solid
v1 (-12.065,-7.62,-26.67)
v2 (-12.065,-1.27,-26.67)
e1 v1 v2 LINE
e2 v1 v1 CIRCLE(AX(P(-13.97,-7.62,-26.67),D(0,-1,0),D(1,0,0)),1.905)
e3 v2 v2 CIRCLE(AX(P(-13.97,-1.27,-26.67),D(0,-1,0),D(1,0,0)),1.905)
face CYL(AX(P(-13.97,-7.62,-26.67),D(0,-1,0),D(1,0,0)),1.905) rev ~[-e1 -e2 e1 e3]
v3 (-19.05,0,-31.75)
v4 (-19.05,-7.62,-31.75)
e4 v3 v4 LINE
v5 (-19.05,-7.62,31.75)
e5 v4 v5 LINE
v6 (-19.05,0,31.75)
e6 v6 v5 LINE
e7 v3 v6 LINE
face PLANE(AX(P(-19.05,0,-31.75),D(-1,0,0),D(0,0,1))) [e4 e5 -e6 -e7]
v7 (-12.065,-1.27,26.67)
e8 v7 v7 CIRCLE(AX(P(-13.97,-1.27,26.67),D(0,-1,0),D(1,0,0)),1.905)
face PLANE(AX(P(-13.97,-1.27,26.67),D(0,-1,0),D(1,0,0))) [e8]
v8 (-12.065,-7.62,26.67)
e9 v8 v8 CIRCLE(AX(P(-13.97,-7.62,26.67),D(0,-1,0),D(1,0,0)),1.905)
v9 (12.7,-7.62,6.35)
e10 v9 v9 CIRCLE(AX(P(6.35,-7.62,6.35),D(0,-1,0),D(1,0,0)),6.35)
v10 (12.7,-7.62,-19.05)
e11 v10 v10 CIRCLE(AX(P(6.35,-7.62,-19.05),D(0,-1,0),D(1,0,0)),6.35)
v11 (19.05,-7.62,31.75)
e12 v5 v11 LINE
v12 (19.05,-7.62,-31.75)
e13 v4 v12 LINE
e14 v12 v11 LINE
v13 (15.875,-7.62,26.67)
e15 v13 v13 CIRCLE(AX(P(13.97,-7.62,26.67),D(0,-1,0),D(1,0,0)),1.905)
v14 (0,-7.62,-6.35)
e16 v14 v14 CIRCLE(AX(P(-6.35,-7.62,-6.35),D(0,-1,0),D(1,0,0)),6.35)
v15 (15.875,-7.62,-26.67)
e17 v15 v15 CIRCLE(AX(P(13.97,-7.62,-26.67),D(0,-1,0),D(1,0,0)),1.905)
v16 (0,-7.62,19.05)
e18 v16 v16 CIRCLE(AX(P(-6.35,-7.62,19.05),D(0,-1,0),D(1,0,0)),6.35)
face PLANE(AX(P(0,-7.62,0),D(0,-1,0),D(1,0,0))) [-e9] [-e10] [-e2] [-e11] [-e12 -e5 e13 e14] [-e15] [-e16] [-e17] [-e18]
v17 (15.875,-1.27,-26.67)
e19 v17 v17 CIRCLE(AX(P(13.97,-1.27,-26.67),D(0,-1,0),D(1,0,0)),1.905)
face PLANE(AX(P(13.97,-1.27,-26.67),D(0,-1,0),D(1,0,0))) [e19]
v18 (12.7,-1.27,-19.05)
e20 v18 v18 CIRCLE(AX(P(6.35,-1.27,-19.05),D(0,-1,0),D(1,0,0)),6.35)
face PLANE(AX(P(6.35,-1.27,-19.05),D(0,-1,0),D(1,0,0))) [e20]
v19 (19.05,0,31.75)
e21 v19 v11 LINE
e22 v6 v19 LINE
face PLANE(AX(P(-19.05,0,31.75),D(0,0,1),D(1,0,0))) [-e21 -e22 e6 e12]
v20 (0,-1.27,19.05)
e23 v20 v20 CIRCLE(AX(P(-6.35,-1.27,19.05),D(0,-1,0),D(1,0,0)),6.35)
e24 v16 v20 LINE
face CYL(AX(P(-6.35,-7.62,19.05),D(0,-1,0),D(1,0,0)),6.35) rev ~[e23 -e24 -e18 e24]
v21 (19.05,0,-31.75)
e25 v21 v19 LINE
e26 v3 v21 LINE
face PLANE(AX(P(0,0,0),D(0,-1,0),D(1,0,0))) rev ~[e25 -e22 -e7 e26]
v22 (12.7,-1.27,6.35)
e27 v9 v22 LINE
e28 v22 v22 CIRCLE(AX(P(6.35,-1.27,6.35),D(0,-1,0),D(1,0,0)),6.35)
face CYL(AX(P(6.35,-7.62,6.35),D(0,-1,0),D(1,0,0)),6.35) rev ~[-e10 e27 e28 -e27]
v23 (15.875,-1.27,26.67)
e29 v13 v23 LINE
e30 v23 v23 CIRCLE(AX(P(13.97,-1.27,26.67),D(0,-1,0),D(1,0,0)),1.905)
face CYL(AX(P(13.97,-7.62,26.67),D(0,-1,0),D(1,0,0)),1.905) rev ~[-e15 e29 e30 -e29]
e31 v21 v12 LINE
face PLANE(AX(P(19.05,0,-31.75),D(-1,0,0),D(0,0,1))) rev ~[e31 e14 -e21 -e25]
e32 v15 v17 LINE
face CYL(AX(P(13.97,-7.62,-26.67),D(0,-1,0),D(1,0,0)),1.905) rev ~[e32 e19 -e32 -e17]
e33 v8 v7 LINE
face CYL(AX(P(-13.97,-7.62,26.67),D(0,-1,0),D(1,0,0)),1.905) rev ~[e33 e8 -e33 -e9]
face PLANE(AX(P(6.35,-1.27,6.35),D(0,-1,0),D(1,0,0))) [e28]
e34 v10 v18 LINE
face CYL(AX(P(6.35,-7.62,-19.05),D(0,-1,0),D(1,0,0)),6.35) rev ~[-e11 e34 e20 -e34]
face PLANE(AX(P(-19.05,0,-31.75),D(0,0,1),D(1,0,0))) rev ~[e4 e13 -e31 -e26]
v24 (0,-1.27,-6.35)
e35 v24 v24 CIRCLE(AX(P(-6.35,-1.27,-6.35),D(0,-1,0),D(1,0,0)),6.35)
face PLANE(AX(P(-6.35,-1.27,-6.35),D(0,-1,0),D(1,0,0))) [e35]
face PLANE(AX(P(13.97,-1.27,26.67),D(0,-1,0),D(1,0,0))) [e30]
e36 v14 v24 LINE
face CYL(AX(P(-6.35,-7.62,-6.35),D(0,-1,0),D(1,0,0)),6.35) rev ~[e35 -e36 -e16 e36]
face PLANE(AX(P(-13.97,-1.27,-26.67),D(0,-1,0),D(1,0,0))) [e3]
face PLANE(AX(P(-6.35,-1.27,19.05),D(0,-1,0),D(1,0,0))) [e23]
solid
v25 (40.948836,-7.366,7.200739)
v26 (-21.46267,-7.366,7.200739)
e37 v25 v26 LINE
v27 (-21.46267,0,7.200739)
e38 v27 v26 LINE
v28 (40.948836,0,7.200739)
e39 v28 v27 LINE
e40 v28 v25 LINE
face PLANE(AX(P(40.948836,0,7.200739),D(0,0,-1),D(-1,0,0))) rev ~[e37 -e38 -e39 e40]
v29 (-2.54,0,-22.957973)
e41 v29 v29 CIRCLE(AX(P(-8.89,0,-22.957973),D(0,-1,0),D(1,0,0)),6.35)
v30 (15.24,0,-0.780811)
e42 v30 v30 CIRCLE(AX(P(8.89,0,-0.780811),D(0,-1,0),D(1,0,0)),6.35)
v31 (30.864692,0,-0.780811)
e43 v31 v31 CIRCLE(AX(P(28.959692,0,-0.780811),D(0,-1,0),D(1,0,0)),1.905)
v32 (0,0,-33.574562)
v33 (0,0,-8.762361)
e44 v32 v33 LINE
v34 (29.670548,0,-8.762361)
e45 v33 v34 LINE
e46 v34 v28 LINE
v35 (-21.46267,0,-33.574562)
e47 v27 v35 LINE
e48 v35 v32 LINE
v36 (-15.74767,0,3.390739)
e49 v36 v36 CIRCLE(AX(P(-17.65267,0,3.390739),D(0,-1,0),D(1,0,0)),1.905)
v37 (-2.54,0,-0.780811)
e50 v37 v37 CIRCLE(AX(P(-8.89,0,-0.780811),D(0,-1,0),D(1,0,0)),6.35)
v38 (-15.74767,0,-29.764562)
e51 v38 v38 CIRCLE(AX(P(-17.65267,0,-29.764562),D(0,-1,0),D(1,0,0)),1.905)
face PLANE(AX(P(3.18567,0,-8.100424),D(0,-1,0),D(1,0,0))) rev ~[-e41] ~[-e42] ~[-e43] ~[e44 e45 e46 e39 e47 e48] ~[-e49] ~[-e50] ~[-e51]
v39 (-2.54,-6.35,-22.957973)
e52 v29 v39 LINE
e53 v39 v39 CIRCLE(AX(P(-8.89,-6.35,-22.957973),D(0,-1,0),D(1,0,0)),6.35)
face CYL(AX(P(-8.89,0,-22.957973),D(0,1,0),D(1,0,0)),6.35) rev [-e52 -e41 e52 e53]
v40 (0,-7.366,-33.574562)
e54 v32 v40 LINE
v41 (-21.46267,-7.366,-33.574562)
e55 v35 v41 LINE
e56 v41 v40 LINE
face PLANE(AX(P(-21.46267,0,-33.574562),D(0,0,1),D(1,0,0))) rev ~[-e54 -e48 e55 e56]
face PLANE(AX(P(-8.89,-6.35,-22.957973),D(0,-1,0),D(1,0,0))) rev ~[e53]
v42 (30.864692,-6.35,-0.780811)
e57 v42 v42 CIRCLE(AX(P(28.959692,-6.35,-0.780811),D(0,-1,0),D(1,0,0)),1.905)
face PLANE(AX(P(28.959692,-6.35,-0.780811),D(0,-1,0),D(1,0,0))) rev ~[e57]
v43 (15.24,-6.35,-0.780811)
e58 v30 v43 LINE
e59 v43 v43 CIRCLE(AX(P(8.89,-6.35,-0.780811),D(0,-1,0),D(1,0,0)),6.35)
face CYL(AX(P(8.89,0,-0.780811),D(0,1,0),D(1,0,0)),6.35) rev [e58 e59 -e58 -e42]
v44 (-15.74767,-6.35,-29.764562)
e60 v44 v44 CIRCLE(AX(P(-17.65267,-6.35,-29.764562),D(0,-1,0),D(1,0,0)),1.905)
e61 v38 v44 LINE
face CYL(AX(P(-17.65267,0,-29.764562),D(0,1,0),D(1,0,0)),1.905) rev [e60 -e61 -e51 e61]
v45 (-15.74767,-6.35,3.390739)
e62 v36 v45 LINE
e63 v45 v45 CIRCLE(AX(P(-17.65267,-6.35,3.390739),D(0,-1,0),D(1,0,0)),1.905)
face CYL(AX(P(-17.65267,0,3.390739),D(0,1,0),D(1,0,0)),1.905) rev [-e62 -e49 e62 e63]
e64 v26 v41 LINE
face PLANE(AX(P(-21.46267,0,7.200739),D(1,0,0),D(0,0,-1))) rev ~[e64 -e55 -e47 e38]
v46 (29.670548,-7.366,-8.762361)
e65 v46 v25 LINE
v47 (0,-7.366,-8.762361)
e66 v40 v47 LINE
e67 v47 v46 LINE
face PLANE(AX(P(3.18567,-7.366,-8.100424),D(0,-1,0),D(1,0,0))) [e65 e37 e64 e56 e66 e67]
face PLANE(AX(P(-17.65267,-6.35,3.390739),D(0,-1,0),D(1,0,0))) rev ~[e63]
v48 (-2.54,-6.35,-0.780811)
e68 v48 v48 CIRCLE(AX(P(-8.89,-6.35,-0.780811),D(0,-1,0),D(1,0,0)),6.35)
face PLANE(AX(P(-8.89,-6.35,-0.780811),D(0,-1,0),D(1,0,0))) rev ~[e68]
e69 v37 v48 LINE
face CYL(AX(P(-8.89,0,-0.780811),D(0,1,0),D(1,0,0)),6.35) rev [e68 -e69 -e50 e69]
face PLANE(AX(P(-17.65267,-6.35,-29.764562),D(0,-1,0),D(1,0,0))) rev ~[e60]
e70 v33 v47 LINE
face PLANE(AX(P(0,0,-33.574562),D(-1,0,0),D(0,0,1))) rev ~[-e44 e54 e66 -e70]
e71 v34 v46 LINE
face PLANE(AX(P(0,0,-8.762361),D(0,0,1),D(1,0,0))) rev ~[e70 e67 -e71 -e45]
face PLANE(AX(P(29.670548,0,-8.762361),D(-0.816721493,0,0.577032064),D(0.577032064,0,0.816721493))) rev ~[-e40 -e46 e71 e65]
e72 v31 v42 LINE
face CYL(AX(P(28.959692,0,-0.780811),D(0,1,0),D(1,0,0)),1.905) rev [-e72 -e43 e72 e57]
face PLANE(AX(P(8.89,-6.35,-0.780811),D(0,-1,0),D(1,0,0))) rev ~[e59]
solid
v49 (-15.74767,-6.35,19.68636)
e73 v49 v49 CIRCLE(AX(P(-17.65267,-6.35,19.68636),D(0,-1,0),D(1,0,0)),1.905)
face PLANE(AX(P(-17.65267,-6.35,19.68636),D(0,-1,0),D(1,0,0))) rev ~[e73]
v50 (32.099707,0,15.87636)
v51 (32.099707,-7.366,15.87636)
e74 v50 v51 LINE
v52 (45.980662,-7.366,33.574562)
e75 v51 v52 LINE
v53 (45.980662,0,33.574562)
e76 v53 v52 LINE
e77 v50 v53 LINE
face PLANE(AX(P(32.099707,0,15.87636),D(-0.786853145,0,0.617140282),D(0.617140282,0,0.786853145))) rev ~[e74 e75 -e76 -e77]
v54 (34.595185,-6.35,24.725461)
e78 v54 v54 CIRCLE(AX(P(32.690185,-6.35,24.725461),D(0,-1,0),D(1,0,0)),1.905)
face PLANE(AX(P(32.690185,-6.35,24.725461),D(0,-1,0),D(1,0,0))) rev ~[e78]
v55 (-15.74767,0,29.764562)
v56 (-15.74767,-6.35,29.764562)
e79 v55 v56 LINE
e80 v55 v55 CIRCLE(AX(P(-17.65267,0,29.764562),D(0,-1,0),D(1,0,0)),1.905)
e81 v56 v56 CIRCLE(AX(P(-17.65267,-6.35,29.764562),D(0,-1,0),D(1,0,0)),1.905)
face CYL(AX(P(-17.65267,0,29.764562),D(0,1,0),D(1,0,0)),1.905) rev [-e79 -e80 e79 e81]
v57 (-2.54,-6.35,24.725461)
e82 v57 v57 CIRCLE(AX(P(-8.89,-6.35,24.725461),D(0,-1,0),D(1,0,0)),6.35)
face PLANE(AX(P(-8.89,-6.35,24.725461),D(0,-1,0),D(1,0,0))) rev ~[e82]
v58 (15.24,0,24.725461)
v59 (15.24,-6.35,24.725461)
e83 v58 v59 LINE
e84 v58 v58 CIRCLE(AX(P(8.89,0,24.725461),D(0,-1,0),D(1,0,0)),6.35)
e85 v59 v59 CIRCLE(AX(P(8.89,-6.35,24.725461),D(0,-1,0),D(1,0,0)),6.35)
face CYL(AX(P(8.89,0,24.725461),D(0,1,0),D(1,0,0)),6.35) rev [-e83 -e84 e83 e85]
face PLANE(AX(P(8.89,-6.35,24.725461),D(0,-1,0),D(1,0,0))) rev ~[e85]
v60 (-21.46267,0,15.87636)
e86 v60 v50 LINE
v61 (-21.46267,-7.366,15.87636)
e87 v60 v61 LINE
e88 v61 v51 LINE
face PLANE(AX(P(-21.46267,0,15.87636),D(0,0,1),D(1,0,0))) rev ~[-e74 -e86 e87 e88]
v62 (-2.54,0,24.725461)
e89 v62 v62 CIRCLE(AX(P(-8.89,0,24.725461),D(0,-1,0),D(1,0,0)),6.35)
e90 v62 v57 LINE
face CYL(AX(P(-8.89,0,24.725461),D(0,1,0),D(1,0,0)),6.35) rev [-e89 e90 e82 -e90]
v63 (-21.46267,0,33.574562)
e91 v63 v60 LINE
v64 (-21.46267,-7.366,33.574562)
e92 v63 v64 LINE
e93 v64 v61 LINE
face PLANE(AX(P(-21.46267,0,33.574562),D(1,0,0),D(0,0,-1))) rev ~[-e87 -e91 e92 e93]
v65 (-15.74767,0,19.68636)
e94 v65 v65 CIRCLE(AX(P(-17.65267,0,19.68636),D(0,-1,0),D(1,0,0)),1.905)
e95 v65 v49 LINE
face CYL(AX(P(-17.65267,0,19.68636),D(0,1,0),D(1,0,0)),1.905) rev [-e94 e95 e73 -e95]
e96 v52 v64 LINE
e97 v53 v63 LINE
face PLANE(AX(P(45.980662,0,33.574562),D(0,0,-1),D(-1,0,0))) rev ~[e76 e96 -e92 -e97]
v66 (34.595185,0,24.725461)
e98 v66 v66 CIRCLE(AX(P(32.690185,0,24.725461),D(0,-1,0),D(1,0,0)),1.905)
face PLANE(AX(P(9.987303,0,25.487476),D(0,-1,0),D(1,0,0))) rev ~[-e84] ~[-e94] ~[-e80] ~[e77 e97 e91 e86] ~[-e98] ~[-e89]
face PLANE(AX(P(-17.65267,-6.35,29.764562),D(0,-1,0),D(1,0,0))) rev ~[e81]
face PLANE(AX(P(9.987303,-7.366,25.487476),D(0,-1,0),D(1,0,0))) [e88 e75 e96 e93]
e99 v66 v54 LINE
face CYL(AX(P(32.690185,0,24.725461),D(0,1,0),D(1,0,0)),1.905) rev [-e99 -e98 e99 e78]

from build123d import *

# Parameters (mm, degrees)
F1_DEPTH = 7.366
F3_W     = 38.1
F3_H     = 63.5
F4_DEPTH = 7.62
F5_R     = 6.35
F5_R_2   = 1.905
F6_DEPTH = 6.35
F2_R     = 6.35
F2_R_2   = 1.905
F7_DEPTH = 6.35


# Not quite as in the source:
# - a feature of the source that left no trace in its solid (it failed there, or was rolled back) is left out


with BuildPart() as f1:
    # F0 (on Front) → F1 (new body)
    with BuildSketch(Plane.XZ):
        Polygon((40.94883606, 7.20073871), (-21.4626698, 7.20073871), (-21.4626698, -33.57456201), (0, -33.57456201), (0, -8.76236119), (29.67054772, -8.76236119), align=None)
    extrude(amount=F1_DEPTH)


with BuildPart() as f1b:
    # F0 (on Front) → F1, piece 2 (new body)
    with BuildSketch(Plane.XZ):
        Polygon((-21.4626698, 15.87636017), (32.0997072, 15.87636017), (45.98066242, 33.57456201), (-21.4626698, 33.57456201), align=None)
    extrude(amount=F1_DEPTH)


with BuildPart() as f4:
    # F3 (on Front) → F4 (new body)
    with BuildSketch(Plane.XZ):
        Rectangle(F3_W, F3_H)
    extrude(amount=F4_DEPTH)

    # F5 (on face) → F6 (cut)
    with BuildSketch(Plane.XZ.offset(7.62)):
        with Locations((-6.35, 19.05)):
            Circle(F5_R)
        with Locations((6.35, 6.35)):
            Circle(F5_R)
        with Locations((-6.35, -6.35)):
            Circle(F5_R)
        with Locations((6.35, -19.05)):
            Circle(F5_R)
        with Locations((13.97, 26.67)):
            Circle(F5_R_2)
        with Locations((13.97, -26.67)):
            Circle(F5_R_2)
        with Locations((-13.97, -26.67)):
            Circle(F5_R_2)
        with Locations((-13.97, 26.67)):
            Circle(F5_R_2)
    extrude(amount=-F6_DEPTH, mode=Mode.SUBTRACT)


with BuildPart() as f7_tool:
    # F2 (on face) → F7 (new body)
    with BuildSketch(Plane.XZ):
        with Locations((-8.89, 24.72546109)):
            Circle(F2_R)
        with Locations((8.89, 24.72546109)):
            Circle(F2_R)
        with Locations((8.89, -0.78081124)):
            Circle(F2_R)
        with Locations((-8.89, -0.78081124)):
            Circle(F2_R)
        with Locations((-8.89, -22.9579730041)):
            Circle(F2_R)
        with Locations((32.69018481, 24.72546109)):
            Circle(F2_R_2)
        with Locations((-17.6526698, 29.76456201)):
            Circle(F2_R_2)
        with Locations((-17.6526698, 19.68636017)):
            Circle(F2_R_2)
        with Locations((28.95969189, -0.78081124)):
            Circle(F2_R_2)
        with Locations((-17.6526698, 3.39073871)):
            Circle(F2_R_2)
        with Locations((-17.6526698, -29.76456201)):
            Circle(F2_R_2)
    extrude(amount=F7_DEPTH)


with BuildPart() as f1_1:
    add(f1.part)

    # F7: cut by f7_tool
    add(f7_tool.part, mode=Mode.SUBTRACT)


with BuildPart() as f1b_1:
    add(f1b.part)

    # F7: cut by f7_tool
    add(f7_tool.part, mode=Mode.SUBTRACT)


solid = Compound([f4.part, f1_1.part, f1b_1.part])
